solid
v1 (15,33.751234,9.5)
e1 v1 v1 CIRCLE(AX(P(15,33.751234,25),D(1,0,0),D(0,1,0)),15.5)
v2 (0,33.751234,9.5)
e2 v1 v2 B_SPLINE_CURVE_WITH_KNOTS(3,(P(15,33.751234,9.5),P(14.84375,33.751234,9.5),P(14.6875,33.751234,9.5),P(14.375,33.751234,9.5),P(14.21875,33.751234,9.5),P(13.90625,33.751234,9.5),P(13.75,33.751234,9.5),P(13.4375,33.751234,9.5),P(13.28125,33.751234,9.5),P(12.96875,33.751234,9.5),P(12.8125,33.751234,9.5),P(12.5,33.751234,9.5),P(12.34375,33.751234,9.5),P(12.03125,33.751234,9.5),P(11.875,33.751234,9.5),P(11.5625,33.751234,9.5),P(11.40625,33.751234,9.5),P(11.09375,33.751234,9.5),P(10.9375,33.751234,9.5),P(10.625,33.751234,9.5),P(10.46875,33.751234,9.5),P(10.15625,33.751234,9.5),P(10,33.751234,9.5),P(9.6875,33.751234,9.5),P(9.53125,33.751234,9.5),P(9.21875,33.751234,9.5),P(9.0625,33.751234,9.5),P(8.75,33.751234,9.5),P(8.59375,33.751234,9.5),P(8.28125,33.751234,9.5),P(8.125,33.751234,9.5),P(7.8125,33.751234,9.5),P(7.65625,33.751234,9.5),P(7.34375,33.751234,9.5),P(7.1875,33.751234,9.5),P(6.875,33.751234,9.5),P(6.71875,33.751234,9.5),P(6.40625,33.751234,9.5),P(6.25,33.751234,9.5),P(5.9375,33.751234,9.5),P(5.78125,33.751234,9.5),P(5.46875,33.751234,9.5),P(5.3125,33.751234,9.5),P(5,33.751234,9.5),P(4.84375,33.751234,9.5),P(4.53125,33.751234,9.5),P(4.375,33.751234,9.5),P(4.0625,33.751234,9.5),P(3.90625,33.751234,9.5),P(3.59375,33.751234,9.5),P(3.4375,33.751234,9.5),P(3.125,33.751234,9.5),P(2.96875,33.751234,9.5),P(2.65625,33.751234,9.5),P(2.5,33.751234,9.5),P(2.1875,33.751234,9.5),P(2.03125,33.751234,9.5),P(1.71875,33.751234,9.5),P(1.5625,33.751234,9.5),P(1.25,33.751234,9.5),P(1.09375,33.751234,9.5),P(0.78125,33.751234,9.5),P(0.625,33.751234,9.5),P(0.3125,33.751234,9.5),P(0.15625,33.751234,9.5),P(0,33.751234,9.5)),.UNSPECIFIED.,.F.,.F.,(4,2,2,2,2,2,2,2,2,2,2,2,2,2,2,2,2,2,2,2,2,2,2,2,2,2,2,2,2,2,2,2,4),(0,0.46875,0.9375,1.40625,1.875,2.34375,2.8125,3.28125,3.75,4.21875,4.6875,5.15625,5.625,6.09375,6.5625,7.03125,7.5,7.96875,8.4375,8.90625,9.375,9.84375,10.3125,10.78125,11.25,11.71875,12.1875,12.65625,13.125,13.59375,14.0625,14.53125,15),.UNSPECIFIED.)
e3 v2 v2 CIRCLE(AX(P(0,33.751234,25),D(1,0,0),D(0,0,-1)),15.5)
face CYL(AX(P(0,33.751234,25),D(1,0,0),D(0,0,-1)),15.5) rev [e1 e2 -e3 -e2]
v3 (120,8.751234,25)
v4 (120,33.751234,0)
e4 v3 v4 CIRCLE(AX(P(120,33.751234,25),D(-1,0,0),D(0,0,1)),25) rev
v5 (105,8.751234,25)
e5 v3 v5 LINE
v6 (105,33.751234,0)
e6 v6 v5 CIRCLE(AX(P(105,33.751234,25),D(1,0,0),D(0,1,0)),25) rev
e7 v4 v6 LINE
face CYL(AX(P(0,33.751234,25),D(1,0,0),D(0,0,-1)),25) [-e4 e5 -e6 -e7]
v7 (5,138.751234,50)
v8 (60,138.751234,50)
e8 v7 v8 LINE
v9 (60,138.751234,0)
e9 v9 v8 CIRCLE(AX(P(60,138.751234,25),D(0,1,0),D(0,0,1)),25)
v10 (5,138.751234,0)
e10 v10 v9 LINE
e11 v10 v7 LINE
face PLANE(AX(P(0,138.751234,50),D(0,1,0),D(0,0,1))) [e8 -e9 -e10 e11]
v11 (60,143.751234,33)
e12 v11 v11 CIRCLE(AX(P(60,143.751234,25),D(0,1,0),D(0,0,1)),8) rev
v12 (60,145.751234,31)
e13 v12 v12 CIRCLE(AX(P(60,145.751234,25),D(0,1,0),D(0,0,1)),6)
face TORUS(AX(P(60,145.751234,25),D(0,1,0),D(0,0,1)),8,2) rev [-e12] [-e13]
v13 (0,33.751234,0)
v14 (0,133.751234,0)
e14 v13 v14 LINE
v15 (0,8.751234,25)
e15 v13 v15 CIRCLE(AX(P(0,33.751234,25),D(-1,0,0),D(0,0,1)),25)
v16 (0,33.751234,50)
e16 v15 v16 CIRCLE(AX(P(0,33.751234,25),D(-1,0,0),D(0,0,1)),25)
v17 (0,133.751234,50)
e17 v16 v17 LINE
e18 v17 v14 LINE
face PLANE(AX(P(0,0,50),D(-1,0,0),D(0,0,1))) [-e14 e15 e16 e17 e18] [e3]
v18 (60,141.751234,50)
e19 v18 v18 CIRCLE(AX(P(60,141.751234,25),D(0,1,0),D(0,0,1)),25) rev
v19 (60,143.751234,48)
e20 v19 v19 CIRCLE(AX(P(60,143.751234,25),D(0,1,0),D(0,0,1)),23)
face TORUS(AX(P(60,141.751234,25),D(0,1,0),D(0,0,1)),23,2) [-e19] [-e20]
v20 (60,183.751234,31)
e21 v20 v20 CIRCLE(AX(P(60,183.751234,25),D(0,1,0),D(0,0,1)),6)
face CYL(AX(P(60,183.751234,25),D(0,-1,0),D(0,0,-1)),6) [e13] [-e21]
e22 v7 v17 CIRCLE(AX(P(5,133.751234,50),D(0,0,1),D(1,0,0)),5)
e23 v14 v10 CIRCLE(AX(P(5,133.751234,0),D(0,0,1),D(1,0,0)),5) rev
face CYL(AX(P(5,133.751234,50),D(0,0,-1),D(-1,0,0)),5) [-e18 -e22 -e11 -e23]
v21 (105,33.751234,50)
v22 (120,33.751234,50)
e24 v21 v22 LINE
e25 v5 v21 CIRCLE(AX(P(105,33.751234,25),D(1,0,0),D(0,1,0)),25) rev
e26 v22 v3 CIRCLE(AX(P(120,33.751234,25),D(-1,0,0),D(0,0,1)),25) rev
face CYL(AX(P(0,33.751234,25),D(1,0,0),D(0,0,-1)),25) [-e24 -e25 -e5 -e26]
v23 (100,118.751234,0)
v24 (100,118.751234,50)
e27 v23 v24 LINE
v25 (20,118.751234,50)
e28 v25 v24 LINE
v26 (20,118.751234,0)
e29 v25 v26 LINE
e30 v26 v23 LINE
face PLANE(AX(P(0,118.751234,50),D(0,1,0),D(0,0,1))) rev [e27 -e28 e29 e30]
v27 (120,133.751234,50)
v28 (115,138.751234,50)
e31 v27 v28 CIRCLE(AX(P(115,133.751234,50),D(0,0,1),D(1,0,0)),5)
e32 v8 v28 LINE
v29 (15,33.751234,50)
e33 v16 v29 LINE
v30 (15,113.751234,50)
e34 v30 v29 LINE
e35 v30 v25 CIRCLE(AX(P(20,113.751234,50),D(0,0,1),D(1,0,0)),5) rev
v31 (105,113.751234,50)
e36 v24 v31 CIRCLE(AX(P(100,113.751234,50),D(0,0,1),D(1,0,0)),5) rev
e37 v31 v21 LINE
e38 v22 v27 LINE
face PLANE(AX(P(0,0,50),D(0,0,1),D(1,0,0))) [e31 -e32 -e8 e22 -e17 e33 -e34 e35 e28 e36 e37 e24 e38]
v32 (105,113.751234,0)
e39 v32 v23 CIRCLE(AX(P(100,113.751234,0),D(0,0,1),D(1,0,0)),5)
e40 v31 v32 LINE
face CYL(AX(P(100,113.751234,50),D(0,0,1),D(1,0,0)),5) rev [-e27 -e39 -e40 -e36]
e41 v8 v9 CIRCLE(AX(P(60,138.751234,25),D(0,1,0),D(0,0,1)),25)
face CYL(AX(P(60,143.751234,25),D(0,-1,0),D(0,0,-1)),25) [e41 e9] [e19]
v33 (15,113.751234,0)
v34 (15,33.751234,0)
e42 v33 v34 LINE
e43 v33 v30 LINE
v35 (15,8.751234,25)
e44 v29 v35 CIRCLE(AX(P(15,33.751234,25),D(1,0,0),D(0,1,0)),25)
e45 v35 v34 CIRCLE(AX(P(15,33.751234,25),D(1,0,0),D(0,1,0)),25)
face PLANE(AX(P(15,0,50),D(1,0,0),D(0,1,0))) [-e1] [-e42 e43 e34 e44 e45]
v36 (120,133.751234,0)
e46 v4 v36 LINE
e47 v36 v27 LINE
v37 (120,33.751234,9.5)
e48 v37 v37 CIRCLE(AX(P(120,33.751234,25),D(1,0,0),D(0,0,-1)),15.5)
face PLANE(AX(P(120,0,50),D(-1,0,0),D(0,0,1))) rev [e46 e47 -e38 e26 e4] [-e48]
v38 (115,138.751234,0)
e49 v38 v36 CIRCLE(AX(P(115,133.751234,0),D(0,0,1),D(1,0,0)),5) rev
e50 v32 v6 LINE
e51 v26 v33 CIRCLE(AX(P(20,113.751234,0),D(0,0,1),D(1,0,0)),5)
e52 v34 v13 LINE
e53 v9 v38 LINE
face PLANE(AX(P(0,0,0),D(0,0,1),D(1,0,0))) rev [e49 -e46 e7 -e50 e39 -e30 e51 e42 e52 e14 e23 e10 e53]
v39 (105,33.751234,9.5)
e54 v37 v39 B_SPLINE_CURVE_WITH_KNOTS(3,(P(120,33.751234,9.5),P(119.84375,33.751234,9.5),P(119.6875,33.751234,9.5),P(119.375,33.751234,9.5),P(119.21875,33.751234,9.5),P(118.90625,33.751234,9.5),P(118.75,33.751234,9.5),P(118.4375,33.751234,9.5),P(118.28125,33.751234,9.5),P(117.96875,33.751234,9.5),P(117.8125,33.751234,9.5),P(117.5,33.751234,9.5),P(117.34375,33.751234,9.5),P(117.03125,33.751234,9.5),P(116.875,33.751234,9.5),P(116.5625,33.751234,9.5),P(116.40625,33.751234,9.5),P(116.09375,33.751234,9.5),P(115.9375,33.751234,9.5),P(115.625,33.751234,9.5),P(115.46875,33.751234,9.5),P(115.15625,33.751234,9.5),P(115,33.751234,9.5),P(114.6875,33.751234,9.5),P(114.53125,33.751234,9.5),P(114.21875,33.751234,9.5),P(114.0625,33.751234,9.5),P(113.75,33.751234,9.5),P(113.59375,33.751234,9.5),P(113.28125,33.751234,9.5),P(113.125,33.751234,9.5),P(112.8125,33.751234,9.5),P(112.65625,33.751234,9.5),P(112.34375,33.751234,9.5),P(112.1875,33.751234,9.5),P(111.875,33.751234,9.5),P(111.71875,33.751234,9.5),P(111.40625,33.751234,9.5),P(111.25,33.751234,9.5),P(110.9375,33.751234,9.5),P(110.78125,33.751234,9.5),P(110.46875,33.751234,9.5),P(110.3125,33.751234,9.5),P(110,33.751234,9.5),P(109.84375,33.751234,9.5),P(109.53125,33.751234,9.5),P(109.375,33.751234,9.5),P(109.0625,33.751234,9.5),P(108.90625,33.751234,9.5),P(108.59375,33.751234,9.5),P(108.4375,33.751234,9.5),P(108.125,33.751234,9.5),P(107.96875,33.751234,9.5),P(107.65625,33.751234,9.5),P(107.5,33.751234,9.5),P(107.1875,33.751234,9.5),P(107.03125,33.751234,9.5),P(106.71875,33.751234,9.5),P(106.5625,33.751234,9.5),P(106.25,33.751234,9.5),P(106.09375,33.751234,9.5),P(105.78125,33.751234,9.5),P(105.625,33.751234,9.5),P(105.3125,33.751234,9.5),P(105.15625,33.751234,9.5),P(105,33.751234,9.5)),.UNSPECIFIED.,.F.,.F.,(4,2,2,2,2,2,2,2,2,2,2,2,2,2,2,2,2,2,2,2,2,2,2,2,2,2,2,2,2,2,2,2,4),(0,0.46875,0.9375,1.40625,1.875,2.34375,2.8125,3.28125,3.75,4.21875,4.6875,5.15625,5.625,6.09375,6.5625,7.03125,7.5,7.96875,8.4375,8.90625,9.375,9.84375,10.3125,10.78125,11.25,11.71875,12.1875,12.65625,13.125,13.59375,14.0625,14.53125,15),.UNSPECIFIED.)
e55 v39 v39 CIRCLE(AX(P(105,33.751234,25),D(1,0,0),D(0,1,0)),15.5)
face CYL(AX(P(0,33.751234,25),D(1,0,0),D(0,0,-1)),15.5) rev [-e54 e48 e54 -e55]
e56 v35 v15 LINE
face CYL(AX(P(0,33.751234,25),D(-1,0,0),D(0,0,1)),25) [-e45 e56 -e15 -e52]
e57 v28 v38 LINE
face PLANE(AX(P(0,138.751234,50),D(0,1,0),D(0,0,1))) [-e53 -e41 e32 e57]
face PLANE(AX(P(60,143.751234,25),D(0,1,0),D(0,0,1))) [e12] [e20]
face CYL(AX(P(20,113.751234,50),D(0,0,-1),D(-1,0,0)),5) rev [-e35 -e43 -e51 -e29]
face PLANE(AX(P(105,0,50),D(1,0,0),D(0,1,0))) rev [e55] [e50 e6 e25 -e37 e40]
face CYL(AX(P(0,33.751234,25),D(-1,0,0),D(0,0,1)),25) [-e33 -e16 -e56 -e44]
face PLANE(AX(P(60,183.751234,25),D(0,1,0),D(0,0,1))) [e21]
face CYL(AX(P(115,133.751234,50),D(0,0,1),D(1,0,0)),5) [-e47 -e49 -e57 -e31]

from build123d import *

# Parameters (mm, degrees)
BOSS_EXTRUDE1_DEPTH = 50
FILLET2_R           = 25
FILLET3_R           = 25
FILLET4_R           = 25
FILLET5_R           = 25
SKETCH2_R           = 15.5
CUT_EXTRUDE1_DEPTH  = 191.136542592
SKETCH3_R           = 25
BOSS_EXTRUDE2_DEPTH = 5
SKETCH4_R           = 6
BOSS_EXTRUDE3_DEPTH = 40
FILLET6_R           = 2
FILLET7_R           = 5


with BuildPart() as part:
    # Sketch1 → Boss-Extrude1 (new body)
    with BuildSketch(Plane.XY):
        Polygon((15, 8.751233612), (15, 118.751233612), (105, 118.751233612), (105, 8.751233612), (120, 8.751233612), (120, 138.751233612), (0, 138.751233612), (0, 8.751233612), align=None)
    extrude(amount=BOSS_EXTRUDE1_DEPTH)

    # Fillet2
    fillet2_edges = [part.edges().sort_by_distance(p)[0] for p in [
        (7.5, 8.751233612, 50),
    ]]
    fillet(fillet2_edges, radius=FILLET2_R)

    # Fillet3
    fillet3_edges = [part.edges().sort_by_distance(p)[0] for p in [
        (7.5, 8.751233612, 0),
    ]]
    fillet(fillet3_edges, radius=FILLET3_R - 0.0001)  # a hair under: the kernel refuses the full size

    # Fillet4
    fillet4_edges = [part.edges().sort_by_distance(p)[0] for p in [
        (112.5, 8.751233612, 50),
    ]]
    fillet(fillet4_edges, radius=FILLET4_R)

    # Fillet5
    fillet5_edges = [part.edges().sort_by_distance(p)[0] for p in [
        (112.5, 8.751233612, 0),
    ]]
    fillet(fillet5_edges, radius=FILLET5_R - 0.0001)  # a hair under: the kernel refuses the full size

    # Sketch2 → Cut-Extrude1 (cut, through all)
    with BuildSketch(Plane(origin=(120, 0, 0), x_dir=(0, 0, -1), z_dir=(1, 0, 0))):
        with Locations((-25, 33.751233612)):
            Circle(SKETCH2_R)
    extrude(amount=-CUT_EXTRUDE1_DEPTH, mode=Mode.SUBTRACT)

    # Sketch3 → Boss-Extrude2 (add)
    with BuildSketch(Plane(origin=(0, 138.751233612, 0), x_dir=(1, 0, 0), z_dir=(0, 1, 0))):
        with Locations(Location((60, -25, 0), (0, 0, 270))):
            Circle(SKETCH3_R)
    extrude(amount=BOSS_EXTRUDE2_DEPTH)

    # Sketch4 → Boss-Extrude3 (add)
    with BuildSketch(Plane(origin=(0, 143.751233612, 0), x_dir=(1, 0, 0), z_dir=(0, 1, 0))):
        with Locations(Location((60, -25, 0), (0, 0, 270))):
            Circle(SKETCH4_R)
    extrude(amount=BOSS_EXTRUDE3_DEPTH)

    # Fillet6
    fillet6_edges = [part.edges().sort_by_distance(p)[0] for p in [
        (60, 143.751233612, 0),
        (60, 143.751233612, 19),
    ]]
    fillet(fillet6_edges, radius=FILLET6_R)

    # Fillet7
    fillet7_edges = [part.edges().sort_by_distance(p)[0] for p in [
        (15, 118.751233612, 25),
        (0, 138.751233612, 25),
        (120, 138.751233612, 25),
        (105, 118.751233612, 25),
    ]]
    fillet(fillet7_edges, radius=FILLET7_R)


solid = part.part
